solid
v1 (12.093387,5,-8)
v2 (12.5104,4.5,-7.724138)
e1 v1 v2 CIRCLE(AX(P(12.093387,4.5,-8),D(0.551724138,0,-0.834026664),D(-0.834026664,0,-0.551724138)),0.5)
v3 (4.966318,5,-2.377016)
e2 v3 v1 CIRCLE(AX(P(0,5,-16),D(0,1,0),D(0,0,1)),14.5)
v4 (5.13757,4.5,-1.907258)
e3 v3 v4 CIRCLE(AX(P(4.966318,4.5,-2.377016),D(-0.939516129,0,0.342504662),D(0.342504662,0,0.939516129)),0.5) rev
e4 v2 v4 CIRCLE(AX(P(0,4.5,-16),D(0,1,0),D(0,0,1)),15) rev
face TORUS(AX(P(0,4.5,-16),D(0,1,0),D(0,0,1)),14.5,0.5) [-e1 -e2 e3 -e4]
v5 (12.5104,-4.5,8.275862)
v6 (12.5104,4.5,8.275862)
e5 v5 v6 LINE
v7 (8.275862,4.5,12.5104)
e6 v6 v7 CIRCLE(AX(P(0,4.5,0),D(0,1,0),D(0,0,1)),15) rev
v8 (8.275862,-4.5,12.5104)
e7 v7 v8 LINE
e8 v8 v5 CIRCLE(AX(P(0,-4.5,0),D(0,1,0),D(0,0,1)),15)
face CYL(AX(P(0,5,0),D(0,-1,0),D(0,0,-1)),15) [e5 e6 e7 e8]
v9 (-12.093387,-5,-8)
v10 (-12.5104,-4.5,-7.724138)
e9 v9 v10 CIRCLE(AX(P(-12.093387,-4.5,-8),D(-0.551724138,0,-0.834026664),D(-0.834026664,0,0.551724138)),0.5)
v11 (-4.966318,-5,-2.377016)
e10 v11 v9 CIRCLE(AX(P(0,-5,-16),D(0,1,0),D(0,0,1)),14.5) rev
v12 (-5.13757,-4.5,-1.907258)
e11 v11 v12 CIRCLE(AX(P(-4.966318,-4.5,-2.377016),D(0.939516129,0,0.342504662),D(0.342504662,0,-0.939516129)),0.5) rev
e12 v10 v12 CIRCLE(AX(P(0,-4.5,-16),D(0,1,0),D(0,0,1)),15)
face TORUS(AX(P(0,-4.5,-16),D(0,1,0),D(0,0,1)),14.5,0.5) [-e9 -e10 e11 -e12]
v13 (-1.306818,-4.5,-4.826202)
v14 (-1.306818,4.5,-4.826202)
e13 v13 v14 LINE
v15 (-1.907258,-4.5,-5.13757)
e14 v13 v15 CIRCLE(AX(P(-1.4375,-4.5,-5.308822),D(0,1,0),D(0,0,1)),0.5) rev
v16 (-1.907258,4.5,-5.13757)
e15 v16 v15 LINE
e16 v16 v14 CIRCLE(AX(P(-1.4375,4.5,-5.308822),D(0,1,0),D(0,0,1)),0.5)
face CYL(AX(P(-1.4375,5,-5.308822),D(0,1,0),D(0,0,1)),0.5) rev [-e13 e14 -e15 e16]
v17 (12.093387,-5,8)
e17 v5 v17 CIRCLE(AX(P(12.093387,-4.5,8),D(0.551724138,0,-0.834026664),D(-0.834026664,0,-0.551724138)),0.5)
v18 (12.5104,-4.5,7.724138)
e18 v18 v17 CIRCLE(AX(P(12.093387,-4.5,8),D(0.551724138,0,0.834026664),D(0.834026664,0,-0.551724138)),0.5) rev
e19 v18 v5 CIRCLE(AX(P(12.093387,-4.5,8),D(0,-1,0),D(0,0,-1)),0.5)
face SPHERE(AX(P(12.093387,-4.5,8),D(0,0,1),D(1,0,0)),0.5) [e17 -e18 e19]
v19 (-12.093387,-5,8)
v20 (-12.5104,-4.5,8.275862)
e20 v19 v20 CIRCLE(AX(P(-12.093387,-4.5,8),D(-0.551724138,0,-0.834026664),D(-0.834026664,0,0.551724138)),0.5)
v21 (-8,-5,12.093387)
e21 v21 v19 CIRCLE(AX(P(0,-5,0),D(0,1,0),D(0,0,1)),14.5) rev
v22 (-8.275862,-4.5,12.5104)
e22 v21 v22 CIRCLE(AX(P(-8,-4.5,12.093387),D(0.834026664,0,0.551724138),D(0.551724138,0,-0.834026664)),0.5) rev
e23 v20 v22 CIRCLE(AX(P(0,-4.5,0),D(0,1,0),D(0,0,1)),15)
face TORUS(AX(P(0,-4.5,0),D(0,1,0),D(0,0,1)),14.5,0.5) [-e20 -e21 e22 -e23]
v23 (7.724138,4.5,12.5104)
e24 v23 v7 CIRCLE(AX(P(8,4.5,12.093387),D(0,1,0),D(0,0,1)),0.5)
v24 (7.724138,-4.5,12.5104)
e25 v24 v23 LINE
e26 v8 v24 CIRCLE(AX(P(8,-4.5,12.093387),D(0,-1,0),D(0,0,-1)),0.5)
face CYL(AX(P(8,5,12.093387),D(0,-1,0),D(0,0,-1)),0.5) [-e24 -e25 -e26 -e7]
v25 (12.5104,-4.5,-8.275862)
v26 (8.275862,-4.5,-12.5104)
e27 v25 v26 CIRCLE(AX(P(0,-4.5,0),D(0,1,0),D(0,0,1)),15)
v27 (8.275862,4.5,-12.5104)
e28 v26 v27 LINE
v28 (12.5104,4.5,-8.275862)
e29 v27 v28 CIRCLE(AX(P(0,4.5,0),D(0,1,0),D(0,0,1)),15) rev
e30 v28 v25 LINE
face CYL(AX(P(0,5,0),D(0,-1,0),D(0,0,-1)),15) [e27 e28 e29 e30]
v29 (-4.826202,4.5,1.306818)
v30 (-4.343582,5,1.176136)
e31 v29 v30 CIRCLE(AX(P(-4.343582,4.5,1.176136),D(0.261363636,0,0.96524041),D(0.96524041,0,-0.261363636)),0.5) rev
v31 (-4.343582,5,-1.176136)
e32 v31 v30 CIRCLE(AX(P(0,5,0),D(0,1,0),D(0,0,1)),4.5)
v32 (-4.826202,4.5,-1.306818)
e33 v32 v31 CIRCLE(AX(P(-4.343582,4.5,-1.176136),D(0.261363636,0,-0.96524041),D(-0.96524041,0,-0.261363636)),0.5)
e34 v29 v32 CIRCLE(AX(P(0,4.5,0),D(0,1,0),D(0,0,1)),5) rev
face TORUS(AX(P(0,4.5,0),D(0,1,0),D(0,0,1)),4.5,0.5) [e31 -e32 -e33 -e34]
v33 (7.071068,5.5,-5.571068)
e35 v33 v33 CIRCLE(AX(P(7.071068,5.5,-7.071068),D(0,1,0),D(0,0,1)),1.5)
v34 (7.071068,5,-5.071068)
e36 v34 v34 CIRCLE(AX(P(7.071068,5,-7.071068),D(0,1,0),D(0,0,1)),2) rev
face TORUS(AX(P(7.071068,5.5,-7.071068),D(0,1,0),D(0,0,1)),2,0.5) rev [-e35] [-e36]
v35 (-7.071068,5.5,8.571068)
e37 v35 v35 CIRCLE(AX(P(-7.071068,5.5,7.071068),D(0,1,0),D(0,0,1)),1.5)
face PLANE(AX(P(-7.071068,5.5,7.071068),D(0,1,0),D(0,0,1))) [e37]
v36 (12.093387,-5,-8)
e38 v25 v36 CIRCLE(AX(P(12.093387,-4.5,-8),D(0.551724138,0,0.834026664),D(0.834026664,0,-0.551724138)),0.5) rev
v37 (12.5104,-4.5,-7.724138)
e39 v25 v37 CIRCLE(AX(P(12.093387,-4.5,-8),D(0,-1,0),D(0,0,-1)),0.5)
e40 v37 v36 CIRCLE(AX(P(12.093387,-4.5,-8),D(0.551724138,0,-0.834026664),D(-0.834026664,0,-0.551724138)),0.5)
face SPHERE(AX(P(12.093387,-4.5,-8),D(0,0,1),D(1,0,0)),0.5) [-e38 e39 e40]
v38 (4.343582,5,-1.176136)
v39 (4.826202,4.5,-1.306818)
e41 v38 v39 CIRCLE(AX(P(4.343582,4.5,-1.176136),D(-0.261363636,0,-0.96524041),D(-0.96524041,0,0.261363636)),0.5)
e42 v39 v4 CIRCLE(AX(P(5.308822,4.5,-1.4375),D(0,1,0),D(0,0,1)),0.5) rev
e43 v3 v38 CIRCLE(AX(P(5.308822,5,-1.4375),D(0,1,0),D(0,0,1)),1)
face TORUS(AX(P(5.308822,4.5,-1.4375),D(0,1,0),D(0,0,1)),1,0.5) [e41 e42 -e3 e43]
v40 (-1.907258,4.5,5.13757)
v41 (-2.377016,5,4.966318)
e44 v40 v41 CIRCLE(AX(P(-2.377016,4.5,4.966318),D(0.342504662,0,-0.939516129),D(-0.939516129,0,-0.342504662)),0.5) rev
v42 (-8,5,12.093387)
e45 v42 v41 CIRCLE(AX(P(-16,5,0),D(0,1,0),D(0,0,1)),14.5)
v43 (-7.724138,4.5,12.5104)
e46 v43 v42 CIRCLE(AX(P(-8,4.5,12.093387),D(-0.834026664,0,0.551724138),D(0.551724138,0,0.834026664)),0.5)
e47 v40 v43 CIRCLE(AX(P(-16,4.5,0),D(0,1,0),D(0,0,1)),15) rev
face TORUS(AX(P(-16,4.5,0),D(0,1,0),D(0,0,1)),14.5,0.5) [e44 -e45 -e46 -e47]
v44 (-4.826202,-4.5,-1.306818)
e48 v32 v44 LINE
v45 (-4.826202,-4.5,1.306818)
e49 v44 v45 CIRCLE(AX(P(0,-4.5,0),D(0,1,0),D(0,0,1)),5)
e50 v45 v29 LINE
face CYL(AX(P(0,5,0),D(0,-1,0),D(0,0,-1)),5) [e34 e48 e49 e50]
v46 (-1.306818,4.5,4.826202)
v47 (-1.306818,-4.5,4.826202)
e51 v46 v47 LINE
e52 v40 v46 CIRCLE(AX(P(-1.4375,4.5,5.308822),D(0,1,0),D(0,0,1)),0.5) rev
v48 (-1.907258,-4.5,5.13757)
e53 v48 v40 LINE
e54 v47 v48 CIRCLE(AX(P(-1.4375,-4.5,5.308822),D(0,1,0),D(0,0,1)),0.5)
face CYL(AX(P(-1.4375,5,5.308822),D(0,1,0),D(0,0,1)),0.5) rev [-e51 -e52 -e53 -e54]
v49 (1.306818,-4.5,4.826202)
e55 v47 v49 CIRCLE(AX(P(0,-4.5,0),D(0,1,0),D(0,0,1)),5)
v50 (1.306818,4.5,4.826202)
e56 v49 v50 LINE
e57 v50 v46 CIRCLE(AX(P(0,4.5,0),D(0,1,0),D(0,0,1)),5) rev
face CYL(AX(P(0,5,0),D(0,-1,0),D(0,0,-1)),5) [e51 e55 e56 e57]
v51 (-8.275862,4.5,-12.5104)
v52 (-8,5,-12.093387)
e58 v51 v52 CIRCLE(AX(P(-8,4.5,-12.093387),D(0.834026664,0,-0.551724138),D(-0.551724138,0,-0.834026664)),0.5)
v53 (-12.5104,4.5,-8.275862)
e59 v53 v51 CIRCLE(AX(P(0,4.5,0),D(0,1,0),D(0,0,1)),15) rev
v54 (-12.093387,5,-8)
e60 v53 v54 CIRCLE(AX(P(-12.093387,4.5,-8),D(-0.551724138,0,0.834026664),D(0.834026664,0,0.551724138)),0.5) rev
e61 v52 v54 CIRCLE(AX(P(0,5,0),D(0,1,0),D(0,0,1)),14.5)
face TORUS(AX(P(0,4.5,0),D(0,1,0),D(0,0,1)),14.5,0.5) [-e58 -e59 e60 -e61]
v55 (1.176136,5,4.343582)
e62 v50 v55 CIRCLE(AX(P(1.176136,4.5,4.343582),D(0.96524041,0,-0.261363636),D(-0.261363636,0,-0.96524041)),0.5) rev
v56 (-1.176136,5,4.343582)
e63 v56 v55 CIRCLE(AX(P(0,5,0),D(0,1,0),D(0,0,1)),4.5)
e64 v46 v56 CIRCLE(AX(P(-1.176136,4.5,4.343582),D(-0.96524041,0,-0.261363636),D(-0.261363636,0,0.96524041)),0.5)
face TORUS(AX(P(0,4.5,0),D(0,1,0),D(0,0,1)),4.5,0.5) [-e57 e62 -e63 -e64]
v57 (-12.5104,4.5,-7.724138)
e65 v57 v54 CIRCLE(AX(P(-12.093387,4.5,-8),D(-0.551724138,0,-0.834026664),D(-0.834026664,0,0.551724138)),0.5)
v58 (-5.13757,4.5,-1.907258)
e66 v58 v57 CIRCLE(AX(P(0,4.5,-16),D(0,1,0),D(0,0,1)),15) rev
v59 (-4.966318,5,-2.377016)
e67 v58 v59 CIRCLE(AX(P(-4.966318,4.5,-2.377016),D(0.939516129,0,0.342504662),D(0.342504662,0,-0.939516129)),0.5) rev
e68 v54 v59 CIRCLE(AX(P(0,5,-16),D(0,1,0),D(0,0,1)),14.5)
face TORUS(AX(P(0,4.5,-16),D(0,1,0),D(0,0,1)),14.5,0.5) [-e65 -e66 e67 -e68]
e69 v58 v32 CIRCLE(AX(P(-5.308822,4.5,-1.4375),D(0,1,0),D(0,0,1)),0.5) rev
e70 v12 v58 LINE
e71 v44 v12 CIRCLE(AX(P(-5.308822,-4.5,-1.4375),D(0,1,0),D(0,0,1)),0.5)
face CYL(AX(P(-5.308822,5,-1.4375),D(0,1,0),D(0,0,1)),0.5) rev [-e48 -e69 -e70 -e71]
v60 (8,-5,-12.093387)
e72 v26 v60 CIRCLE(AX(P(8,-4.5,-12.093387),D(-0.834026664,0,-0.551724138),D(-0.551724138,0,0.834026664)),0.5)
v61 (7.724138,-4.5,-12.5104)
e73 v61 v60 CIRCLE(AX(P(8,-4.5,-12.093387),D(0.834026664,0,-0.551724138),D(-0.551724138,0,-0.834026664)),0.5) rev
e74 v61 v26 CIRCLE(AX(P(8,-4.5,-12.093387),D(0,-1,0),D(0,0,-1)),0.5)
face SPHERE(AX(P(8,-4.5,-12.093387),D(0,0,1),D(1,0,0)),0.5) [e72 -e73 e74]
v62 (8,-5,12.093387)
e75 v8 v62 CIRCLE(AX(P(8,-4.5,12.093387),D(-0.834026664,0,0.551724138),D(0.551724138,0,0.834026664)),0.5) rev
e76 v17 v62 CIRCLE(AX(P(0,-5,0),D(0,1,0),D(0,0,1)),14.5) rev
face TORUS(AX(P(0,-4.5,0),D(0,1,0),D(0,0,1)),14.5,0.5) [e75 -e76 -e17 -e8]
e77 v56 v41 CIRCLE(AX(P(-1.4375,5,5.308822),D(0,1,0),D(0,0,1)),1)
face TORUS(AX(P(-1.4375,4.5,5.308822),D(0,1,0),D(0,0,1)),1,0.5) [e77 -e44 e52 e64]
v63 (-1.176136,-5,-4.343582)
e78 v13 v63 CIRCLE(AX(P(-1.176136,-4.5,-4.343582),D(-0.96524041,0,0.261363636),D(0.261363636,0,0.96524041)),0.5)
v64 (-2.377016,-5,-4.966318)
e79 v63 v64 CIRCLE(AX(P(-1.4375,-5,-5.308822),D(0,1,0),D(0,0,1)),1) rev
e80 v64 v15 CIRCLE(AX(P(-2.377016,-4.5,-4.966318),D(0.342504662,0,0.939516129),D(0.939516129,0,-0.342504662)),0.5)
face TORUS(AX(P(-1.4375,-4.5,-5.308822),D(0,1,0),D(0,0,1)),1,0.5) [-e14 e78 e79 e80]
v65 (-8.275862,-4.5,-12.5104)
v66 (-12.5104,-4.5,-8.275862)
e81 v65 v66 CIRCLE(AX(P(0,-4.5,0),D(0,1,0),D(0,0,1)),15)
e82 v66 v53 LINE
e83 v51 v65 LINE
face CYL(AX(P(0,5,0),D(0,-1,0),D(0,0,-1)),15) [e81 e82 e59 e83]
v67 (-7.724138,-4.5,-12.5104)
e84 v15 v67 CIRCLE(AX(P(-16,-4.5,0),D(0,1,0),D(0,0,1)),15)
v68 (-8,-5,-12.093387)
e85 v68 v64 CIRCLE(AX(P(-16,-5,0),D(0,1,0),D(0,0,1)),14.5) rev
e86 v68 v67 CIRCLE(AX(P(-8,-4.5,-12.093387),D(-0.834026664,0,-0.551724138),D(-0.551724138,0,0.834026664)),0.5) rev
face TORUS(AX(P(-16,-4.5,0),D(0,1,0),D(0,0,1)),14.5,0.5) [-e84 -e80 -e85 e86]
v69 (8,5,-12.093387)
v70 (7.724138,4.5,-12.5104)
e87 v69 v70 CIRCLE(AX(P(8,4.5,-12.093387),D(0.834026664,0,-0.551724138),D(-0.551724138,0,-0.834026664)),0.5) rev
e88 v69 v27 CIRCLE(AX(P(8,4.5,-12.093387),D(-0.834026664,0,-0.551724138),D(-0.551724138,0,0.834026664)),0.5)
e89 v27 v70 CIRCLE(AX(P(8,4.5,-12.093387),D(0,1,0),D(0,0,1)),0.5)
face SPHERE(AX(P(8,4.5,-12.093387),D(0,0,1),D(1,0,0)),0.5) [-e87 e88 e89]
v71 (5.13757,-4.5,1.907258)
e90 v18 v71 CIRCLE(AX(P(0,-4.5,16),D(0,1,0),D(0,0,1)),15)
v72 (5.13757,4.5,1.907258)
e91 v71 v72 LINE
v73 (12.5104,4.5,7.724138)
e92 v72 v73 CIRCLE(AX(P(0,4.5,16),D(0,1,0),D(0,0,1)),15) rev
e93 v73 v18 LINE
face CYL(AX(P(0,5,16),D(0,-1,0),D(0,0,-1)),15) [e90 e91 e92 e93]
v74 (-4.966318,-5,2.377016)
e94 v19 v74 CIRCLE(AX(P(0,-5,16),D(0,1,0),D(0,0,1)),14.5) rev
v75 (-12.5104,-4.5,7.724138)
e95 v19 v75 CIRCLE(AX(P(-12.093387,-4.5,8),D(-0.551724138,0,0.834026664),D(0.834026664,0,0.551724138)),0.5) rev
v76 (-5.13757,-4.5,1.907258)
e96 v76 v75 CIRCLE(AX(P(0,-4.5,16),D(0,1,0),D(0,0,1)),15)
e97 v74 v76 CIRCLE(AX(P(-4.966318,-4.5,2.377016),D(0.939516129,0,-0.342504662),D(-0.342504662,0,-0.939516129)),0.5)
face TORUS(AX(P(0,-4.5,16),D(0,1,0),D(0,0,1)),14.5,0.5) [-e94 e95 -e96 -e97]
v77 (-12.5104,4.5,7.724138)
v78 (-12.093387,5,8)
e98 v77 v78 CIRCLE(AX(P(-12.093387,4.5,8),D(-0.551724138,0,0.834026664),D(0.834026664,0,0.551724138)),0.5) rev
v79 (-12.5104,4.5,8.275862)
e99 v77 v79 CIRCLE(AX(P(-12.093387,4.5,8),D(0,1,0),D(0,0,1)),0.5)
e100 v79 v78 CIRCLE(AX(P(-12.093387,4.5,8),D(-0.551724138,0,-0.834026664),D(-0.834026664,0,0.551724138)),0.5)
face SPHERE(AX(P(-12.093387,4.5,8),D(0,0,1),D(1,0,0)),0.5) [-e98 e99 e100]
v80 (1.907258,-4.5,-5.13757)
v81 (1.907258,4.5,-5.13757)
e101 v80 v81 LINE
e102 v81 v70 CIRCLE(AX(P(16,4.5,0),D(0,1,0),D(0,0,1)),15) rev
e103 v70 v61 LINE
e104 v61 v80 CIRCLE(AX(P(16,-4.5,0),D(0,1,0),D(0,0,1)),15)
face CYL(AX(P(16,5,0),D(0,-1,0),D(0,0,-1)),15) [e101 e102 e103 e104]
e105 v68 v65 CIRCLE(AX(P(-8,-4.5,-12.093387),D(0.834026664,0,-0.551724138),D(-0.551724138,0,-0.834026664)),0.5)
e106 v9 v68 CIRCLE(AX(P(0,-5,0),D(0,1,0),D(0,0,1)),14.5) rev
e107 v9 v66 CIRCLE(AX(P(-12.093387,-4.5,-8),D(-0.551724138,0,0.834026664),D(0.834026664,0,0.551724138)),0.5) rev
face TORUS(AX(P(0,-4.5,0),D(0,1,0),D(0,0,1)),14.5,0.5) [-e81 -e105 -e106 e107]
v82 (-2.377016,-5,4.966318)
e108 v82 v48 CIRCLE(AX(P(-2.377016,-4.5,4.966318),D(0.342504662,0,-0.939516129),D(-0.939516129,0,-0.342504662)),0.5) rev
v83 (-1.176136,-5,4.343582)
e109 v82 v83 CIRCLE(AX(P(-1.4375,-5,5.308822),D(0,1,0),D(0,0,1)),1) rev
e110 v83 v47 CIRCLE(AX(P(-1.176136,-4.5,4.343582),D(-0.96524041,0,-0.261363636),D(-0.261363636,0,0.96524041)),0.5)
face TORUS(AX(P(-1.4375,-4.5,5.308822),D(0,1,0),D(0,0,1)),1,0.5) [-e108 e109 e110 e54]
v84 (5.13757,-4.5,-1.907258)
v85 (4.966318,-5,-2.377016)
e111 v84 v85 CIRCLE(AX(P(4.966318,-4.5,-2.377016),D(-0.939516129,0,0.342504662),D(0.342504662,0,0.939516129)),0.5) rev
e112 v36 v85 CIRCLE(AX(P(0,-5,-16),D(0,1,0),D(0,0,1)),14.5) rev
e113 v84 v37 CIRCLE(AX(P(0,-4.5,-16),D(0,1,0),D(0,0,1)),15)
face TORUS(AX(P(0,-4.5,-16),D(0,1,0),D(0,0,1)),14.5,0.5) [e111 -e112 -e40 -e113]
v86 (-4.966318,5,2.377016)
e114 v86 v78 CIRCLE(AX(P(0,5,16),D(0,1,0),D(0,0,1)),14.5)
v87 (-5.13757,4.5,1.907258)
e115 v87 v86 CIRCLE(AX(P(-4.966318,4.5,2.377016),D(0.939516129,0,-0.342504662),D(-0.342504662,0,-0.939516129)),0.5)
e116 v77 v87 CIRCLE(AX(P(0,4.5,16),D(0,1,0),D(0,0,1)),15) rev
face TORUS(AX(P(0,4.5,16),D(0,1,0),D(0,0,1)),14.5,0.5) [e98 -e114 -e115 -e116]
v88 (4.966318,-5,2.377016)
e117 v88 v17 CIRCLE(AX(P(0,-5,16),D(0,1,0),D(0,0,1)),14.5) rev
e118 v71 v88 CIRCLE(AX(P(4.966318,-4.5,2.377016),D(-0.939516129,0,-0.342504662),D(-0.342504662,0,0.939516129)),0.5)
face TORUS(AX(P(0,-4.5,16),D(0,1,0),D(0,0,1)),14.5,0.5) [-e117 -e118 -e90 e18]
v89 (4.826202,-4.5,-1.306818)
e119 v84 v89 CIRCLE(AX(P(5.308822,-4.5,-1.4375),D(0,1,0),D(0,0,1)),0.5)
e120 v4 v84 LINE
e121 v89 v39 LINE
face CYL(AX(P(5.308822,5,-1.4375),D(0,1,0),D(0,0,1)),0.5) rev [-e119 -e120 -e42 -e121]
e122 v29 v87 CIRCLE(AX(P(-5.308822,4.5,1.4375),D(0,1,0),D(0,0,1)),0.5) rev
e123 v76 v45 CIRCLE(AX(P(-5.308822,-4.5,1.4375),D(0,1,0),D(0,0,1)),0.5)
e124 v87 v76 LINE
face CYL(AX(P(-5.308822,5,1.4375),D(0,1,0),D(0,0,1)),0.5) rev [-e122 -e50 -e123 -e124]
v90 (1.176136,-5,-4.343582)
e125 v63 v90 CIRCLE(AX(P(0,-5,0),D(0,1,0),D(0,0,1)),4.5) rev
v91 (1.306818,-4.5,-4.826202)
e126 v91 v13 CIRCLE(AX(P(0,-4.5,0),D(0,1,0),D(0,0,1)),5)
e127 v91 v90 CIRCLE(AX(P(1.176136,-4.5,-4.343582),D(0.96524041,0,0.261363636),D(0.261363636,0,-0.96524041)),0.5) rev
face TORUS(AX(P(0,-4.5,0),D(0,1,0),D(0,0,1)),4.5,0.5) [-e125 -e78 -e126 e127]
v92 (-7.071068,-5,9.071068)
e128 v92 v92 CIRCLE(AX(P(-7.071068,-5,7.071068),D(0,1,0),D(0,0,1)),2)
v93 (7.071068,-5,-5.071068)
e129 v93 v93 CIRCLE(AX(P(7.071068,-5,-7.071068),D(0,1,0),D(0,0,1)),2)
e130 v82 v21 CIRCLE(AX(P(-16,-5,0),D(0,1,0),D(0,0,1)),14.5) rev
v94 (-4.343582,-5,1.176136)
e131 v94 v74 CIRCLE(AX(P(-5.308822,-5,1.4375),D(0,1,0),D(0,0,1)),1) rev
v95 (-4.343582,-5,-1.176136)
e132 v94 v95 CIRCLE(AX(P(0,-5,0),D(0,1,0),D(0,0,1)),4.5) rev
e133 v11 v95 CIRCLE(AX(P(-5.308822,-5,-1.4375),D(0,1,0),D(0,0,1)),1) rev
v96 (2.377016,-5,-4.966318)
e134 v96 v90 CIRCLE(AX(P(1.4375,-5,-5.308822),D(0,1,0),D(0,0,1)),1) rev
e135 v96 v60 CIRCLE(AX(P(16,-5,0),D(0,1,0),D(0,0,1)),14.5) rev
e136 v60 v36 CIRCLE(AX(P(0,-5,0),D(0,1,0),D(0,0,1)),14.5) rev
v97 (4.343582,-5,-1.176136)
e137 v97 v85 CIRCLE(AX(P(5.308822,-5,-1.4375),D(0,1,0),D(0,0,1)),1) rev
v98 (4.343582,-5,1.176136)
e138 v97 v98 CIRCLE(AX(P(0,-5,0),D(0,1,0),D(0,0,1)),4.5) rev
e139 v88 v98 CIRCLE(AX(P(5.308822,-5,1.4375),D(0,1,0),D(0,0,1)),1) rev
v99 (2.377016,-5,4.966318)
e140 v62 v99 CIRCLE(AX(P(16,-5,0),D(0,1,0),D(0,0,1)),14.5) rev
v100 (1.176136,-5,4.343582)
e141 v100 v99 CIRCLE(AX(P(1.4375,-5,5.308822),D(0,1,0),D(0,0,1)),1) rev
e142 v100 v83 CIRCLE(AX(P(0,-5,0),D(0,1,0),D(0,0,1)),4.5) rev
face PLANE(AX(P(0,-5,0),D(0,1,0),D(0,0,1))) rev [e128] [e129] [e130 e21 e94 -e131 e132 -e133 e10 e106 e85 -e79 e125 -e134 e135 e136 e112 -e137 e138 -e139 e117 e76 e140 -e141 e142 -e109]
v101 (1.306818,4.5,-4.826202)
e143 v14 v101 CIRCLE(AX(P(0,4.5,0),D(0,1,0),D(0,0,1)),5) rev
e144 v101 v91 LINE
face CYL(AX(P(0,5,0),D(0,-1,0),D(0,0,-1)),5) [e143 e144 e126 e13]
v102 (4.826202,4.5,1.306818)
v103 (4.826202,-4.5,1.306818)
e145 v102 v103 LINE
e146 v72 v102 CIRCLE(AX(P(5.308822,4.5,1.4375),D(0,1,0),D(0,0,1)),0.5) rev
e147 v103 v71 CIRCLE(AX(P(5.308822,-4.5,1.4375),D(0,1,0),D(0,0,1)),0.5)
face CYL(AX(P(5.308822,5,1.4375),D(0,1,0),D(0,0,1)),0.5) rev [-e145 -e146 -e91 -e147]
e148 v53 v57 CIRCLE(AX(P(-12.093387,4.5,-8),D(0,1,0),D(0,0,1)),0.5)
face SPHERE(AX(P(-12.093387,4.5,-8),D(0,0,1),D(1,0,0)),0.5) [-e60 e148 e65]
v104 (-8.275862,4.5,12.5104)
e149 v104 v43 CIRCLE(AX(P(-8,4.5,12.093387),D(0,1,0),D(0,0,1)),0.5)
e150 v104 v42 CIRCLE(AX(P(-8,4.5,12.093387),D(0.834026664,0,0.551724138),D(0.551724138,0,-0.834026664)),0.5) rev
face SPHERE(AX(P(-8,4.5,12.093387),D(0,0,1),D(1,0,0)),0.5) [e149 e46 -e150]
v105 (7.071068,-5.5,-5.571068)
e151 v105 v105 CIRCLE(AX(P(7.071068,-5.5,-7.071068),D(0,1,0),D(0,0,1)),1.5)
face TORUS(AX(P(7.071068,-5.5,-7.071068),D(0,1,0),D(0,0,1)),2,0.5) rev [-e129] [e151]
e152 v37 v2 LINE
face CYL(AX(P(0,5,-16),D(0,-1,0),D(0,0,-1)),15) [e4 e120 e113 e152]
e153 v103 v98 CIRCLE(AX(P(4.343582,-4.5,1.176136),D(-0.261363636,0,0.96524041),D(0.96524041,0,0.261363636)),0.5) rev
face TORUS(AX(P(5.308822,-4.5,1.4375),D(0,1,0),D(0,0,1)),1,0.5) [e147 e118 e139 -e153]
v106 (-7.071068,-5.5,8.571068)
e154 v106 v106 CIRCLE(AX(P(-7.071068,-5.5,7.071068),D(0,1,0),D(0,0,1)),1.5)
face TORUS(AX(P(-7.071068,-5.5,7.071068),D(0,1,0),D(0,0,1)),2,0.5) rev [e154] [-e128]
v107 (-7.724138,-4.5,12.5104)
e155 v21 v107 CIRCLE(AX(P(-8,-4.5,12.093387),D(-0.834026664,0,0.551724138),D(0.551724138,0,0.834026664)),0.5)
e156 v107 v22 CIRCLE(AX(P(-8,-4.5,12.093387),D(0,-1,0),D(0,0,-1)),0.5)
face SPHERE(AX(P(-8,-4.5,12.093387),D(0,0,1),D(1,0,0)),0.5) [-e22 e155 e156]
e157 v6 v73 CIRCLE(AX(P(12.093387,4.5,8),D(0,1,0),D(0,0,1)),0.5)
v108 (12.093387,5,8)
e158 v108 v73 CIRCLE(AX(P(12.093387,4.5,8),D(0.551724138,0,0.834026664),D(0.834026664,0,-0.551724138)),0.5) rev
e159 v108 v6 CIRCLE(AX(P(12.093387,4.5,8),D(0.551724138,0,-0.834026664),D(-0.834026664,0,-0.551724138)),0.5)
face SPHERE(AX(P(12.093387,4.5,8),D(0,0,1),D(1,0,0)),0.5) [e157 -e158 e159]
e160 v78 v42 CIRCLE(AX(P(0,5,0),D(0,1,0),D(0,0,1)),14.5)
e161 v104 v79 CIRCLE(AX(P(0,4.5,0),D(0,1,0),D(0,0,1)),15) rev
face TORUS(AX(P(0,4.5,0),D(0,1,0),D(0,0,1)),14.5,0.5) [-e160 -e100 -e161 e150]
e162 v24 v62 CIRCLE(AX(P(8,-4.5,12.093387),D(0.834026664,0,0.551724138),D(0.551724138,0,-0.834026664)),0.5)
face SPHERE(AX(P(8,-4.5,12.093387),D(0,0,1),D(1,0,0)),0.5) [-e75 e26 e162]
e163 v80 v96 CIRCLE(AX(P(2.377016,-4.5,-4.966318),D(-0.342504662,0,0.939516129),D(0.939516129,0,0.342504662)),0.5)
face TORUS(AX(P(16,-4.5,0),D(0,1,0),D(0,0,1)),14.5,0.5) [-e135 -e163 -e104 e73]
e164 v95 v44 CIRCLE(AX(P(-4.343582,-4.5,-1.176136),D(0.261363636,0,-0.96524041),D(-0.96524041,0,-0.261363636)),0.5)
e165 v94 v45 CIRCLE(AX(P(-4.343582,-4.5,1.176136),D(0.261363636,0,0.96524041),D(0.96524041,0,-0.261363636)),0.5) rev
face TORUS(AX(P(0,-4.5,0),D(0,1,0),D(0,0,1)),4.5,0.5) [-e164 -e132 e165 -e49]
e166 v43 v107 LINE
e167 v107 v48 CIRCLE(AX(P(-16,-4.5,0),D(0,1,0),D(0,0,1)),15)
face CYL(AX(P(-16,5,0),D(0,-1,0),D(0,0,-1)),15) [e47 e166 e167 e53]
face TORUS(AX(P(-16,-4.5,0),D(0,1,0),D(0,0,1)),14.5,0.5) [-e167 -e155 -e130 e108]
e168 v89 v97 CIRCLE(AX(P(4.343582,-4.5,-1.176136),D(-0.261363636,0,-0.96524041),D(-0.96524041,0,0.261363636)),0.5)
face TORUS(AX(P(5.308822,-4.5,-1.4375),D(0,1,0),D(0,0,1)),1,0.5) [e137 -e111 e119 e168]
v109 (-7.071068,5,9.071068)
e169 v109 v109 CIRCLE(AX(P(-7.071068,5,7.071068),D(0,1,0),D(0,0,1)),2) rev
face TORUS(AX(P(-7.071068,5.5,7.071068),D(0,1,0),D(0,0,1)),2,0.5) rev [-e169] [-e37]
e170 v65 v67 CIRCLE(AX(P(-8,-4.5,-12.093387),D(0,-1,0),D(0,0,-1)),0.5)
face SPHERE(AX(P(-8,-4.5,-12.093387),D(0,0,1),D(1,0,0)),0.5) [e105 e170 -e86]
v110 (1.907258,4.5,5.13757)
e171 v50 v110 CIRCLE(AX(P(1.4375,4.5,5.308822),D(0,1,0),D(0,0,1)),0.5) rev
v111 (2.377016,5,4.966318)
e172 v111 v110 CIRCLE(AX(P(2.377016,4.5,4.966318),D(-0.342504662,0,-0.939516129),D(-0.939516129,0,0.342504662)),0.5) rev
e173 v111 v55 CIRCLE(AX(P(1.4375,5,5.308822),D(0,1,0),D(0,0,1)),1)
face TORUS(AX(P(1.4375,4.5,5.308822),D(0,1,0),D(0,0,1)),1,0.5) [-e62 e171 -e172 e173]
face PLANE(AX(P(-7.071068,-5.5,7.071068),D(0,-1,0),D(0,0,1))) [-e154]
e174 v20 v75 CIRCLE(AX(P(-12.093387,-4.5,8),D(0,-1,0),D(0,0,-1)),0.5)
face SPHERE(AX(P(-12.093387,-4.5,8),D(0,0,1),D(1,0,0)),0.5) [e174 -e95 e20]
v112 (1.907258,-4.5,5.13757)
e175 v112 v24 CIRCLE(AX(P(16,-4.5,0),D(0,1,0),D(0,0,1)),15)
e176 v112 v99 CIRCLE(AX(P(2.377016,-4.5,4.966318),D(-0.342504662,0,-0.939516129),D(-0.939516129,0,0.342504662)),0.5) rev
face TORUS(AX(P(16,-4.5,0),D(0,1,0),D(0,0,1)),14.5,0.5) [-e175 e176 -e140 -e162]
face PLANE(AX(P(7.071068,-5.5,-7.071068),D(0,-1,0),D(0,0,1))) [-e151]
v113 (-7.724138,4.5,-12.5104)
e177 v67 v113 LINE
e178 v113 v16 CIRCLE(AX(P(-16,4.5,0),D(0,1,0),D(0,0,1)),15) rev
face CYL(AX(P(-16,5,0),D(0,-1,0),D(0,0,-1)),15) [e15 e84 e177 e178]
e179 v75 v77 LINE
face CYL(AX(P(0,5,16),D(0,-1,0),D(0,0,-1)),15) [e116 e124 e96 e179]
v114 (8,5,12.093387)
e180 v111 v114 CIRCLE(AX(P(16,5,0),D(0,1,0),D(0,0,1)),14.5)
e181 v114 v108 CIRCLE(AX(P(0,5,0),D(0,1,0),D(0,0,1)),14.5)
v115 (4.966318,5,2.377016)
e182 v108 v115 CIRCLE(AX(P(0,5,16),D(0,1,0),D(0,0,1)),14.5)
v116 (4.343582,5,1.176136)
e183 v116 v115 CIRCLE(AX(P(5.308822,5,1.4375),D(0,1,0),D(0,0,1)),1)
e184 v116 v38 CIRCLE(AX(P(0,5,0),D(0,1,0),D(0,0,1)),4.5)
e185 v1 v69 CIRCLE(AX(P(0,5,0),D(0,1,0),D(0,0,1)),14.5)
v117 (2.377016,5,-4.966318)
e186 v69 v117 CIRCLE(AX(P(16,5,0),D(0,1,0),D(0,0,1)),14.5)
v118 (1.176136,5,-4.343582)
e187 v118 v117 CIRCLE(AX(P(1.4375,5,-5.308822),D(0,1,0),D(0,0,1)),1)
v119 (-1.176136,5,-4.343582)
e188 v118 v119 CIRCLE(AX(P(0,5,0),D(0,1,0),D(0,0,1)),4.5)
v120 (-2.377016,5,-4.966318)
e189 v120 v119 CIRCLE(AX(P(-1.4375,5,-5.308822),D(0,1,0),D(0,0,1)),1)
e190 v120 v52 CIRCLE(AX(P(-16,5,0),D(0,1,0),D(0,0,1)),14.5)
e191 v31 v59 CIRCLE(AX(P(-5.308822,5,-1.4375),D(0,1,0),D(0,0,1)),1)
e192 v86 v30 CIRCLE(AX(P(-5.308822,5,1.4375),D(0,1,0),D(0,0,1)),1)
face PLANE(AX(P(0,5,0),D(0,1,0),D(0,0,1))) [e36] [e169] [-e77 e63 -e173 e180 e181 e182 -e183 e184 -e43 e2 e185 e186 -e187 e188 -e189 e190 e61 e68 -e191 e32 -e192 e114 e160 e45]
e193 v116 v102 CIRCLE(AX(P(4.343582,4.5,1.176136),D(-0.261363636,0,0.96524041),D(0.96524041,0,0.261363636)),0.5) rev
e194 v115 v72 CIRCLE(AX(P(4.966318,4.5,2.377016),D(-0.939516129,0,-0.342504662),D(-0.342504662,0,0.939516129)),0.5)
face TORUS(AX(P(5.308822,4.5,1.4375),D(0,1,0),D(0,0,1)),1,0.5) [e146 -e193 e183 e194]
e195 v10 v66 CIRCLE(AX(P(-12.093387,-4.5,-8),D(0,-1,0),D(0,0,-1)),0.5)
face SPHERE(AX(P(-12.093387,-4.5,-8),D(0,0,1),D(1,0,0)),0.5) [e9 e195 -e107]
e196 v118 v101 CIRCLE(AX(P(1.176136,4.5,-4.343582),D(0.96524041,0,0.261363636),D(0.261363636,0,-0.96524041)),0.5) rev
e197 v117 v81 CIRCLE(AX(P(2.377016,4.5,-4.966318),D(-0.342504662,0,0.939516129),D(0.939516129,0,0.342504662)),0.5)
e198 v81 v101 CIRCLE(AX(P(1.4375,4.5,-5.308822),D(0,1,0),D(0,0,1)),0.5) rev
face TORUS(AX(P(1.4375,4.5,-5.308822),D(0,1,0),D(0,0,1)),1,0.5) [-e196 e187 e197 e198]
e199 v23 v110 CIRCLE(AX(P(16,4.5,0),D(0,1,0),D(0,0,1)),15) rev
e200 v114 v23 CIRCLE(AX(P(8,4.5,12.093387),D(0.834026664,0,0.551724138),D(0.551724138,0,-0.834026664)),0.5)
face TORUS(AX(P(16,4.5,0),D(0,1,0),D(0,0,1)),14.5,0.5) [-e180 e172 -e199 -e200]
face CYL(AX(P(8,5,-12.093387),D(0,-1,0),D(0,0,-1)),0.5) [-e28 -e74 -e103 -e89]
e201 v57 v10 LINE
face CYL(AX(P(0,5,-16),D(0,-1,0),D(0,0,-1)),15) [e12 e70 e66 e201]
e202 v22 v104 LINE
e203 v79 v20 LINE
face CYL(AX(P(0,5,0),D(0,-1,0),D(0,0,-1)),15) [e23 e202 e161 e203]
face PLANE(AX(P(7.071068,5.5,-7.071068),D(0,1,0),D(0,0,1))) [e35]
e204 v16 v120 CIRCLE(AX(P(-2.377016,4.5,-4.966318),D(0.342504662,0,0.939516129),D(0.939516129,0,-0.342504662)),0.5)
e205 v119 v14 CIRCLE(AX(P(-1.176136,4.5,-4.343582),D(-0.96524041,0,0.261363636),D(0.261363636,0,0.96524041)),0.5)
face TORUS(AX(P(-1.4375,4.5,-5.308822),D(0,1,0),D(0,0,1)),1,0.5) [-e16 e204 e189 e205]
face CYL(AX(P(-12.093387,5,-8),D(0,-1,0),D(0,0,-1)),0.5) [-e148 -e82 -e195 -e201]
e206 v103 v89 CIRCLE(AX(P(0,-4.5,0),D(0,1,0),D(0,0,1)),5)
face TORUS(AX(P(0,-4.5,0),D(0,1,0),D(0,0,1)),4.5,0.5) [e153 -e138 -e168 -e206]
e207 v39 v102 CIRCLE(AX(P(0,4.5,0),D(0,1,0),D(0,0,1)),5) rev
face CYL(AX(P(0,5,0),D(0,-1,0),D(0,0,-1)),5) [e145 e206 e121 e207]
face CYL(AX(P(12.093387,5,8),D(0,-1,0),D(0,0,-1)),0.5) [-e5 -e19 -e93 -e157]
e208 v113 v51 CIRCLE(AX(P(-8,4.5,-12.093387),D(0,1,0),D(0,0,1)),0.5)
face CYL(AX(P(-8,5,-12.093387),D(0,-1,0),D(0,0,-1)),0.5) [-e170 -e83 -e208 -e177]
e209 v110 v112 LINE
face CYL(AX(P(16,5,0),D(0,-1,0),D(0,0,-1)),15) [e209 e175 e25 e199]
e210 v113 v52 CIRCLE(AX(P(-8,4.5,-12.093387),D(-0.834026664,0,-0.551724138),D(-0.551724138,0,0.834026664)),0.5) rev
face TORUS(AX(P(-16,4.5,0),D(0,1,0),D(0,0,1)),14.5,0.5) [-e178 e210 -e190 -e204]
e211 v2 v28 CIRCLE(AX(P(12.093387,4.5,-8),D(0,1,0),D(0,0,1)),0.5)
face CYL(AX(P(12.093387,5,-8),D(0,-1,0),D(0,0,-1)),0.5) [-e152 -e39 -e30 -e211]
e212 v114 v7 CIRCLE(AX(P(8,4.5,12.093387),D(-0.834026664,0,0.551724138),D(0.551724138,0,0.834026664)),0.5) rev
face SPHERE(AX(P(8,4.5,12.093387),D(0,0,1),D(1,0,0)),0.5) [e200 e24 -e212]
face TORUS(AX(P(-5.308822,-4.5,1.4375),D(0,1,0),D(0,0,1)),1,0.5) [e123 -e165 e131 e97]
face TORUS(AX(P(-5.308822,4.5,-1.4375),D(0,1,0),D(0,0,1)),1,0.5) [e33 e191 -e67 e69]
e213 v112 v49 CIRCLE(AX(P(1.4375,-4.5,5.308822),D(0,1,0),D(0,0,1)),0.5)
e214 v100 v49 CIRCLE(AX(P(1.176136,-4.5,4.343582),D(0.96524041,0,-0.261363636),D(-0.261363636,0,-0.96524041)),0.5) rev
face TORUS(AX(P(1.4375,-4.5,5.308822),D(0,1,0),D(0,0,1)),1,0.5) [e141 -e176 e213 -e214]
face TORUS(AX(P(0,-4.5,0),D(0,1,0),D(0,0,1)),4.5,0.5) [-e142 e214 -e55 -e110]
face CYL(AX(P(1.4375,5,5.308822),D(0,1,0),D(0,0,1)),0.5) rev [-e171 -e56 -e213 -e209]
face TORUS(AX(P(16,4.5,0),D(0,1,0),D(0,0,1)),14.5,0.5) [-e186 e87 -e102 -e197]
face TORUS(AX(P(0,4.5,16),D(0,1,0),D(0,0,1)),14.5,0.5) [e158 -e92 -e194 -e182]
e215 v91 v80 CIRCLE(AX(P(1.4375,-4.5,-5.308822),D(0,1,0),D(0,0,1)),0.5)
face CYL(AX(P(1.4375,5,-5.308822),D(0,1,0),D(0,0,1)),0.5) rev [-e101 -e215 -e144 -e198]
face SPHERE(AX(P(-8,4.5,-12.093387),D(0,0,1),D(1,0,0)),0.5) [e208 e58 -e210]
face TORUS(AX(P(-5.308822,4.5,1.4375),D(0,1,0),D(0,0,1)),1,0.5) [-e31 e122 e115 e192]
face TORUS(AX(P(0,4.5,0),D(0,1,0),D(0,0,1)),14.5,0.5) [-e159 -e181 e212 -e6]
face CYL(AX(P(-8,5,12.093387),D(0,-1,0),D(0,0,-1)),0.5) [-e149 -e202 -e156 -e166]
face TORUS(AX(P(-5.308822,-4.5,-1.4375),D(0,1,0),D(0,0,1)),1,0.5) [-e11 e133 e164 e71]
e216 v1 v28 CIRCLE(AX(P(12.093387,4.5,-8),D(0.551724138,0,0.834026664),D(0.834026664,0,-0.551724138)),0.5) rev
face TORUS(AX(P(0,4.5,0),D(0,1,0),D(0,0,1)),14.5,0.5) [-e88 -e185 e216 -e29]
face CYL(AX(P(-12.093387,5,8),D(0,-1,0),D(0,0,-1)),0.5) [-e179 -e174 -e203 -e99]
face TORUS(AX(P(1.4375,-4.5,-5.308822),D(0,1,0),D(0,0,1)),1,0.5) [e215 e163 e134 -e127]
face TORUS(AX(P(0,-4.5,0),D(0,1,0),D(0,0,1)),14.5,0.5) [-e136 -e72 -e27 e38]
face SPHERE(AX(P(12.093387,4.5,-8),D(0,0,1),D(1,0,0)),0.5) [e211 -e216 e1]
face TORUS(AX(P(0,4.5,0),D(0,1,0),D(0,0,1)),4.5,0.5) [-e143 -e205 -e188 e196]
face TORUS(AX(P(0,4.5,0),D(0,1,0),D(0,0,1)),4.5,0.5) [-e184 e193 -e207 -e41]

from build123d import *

# Parameters (mm, degrees)
SKETCH1_R      = 15
EXTRUDE1_DEPTH = 5
EXTRUDE2_START = -10
EXTRUDE2_DEPTH = 10
SKETCH4_R      = 1.5
EXTRUDE3_DEPTH = 0.5
FILLET1_R      = 0.5


# Read off the part's stored shape, not the designer's step: Extrude2
with BuildPart() as part:
    # Sketch1 → Extrude1 (new, symmetric)
    with BuildSketch(Plane(origin=(0, 0, 0), x_dir=(1, 0, 0), z_dir=(0, 1, 0))):
        with Locations(Location((0, 0, 0), (0, 0, 270))):
            Circle(SKETCH1_R)
    extrude(amount=EXTRUDE1_DEPTH, both=True)

    # Extrude2 outline → Extrude2 (cut)
    with BuildSketch(Plane.XZ.offset(5).offset(EXTRUDE2_START)):
        with BuildLine():
            ThreePointArc((-1.75, 4.683748499), (0, 5), (1.75, 4.683748499))
            ThreePointArc((1.75, 4.683748499), (4.176931574, 9.231199976), (8, 12.68857754))
            ThreePointArc((8, 12.68857754), (0, 15), (-8, 12.68857754))
            ThreePointArc((-8, 12.68857754), (-4.176931574, 9.231199976), (-1.75, 4.683748499))
        make_face()
        with BuildLine():
            ThreePointArc((12.68857754, -8), (15, 0), (12.68857754, 8))
            ThreePointArc((12.68857754, 8), (9.231199976, 4.176931574), (4.683748499, 1.75))
            ThreePointArc((4.683748499, 1.75), (5, 0), (4.683748499, -1.75))
            ThreePointArc((4.683748499, -1.75), (9.231199976, -4.176931574), (12.68857754, -8))
        make_face()
        with BuildLine():
            ThreePointArc((-4.683748499, 1.75), (-9.231199976, 4.176931574), (-12.68857754, 8))
            ThreePointArc((-12.68857754, 8), (-15, 0), (-12.68857754, -8))
            ThreePointArc((-12.68857754, -8), (-9.231199976, -4.176931574), (-4.683748499, -1.75))
            ThreePointArc((-4.683748499, -1.75), (-5, 0), (-4.683748499, 1.75))
        make_face()
        with BuildLine():
            ThreePointArc((-1.75, -4.683748499), (-4.176931574, -9.231199976), (-8, -12.68857754))
            ThreePointArc((-8, -12.68857754), (0, -15), (8, -12.68857754))
            ThreePointArc((8, -12.68857754), (4.176931574, -9.231199976), (1.75, -4.683748499))
            ThreePointArc((1.75, -4.683748499), (0, -5), (-1.75, -4.683748499))
        make_face()
    extrude(amount=EXTRUDE2_DEPTH, mode=Mode.SUBTRACT)

    # Sketch4 → Extrude3 (add)
    with BuildSketch(Plane(origin=(0, 5, 0), x_dir=(1, 0, 0), z_dir=(0, 1, 0))):
        with Locations(Location((7.071067812, 7.071067812, 0), (0, 0, 270))):
            Circle(SKETCH4_R)
        with Locations(Location((-7.071067812, -7.071067812, 0), (0, 0, 270))):
            Circle(SKETCH4_R)
    extrude3 = extrude(amount=EXTRUDE3_DEPTH)

    # Mirror1: Extrude3 across plane
    add(extrude3.mirror(Plane.ZX))

    # Fillet1
    fillet1_edges = [part.edges().sort_by_distance(p)[0] for p in [
        (10.606601718, 5, -10.606601718),
        (-10.606601718, 5, -10.606601718),
        (-10.606601718, 5, 10.606601718),
        (10.606601718, -5, 10.606601718),
        (4.176931574, 5, 9.231199976),
        (1.75, 0, 4.683748499),
        (8, 0, 12.68857754),
        (9.231199976, 5, 4.176931574),
        (12.68857754, 0, 8),
        (5, 5, 0),
        (4.683748499, 0, 1.75),
        (9.231199976, 5, -4.176931574),
        (4.683748499, 0, -1.75),
        (12.68857754, 0, -8),
        (4.176931574, 5, -9.231199976),
        (8, 0, -12.68857754),
        (0, 5, -5),
        (1.75, 0, -4.683748499),
        (-4.176931574, 5, -9.231199976),
        (-1.75, 0, -4.683748499),
        (-8, 0, -12.68857754),
        (-9.231199976, 5, -4.176931574),
        (-12.68857754, 0, -8),
        (-5, 5, 0),
        (-4.683748499, 0, -1.75),
        (-9.231199976, 5, 4.176931574),
        (-4.683748499, 0, 1.75),
        (-12.68857754, 0, 8),
        (-4.176931574, 5, 9.231199976),
        (-8, 0, 12.68857754),
        (0, 5, 5),
        (-1.75, 0, 4.683748499),
        (4.176931574, -5, 9.231199976),
        (0, -5, 5),
        (-4.176931574, -5, 9.231199976),
        (-9.231199976, -5, 4.176931574),
        (-5, -5, 0),
        (-9.231199976, -5, -4.176931574),
        (-4.176931574, -5, -9.231199976),
        (0, -5, -5),
        (4.176931574, -5, -9.231199976),
        (9.231199976, -5, -4.176931574),
        (5, -5, 0),
        (9.231199976, -5, 4.176931574),
        (10.606601718, 5, 10.606601718),
        (10.606601718, -5, -10.606601718),
        (7.071067812, 5, -8.571067812),
        (-10.606601718, -5, -10.606601718),
        (-7.071067812, 5, 5.571067812),
        (-10.606601718, -5, 10.606601718),
        (7.071067812, -5, -8.571067812),
        (-7.071067812, -5, 5.571067812),
    ]]
    fillet(fillet1_edges, radius=FILLET1_R - 0.0001)  # a hair under: the kernel refuses the full size


solid = part.part
